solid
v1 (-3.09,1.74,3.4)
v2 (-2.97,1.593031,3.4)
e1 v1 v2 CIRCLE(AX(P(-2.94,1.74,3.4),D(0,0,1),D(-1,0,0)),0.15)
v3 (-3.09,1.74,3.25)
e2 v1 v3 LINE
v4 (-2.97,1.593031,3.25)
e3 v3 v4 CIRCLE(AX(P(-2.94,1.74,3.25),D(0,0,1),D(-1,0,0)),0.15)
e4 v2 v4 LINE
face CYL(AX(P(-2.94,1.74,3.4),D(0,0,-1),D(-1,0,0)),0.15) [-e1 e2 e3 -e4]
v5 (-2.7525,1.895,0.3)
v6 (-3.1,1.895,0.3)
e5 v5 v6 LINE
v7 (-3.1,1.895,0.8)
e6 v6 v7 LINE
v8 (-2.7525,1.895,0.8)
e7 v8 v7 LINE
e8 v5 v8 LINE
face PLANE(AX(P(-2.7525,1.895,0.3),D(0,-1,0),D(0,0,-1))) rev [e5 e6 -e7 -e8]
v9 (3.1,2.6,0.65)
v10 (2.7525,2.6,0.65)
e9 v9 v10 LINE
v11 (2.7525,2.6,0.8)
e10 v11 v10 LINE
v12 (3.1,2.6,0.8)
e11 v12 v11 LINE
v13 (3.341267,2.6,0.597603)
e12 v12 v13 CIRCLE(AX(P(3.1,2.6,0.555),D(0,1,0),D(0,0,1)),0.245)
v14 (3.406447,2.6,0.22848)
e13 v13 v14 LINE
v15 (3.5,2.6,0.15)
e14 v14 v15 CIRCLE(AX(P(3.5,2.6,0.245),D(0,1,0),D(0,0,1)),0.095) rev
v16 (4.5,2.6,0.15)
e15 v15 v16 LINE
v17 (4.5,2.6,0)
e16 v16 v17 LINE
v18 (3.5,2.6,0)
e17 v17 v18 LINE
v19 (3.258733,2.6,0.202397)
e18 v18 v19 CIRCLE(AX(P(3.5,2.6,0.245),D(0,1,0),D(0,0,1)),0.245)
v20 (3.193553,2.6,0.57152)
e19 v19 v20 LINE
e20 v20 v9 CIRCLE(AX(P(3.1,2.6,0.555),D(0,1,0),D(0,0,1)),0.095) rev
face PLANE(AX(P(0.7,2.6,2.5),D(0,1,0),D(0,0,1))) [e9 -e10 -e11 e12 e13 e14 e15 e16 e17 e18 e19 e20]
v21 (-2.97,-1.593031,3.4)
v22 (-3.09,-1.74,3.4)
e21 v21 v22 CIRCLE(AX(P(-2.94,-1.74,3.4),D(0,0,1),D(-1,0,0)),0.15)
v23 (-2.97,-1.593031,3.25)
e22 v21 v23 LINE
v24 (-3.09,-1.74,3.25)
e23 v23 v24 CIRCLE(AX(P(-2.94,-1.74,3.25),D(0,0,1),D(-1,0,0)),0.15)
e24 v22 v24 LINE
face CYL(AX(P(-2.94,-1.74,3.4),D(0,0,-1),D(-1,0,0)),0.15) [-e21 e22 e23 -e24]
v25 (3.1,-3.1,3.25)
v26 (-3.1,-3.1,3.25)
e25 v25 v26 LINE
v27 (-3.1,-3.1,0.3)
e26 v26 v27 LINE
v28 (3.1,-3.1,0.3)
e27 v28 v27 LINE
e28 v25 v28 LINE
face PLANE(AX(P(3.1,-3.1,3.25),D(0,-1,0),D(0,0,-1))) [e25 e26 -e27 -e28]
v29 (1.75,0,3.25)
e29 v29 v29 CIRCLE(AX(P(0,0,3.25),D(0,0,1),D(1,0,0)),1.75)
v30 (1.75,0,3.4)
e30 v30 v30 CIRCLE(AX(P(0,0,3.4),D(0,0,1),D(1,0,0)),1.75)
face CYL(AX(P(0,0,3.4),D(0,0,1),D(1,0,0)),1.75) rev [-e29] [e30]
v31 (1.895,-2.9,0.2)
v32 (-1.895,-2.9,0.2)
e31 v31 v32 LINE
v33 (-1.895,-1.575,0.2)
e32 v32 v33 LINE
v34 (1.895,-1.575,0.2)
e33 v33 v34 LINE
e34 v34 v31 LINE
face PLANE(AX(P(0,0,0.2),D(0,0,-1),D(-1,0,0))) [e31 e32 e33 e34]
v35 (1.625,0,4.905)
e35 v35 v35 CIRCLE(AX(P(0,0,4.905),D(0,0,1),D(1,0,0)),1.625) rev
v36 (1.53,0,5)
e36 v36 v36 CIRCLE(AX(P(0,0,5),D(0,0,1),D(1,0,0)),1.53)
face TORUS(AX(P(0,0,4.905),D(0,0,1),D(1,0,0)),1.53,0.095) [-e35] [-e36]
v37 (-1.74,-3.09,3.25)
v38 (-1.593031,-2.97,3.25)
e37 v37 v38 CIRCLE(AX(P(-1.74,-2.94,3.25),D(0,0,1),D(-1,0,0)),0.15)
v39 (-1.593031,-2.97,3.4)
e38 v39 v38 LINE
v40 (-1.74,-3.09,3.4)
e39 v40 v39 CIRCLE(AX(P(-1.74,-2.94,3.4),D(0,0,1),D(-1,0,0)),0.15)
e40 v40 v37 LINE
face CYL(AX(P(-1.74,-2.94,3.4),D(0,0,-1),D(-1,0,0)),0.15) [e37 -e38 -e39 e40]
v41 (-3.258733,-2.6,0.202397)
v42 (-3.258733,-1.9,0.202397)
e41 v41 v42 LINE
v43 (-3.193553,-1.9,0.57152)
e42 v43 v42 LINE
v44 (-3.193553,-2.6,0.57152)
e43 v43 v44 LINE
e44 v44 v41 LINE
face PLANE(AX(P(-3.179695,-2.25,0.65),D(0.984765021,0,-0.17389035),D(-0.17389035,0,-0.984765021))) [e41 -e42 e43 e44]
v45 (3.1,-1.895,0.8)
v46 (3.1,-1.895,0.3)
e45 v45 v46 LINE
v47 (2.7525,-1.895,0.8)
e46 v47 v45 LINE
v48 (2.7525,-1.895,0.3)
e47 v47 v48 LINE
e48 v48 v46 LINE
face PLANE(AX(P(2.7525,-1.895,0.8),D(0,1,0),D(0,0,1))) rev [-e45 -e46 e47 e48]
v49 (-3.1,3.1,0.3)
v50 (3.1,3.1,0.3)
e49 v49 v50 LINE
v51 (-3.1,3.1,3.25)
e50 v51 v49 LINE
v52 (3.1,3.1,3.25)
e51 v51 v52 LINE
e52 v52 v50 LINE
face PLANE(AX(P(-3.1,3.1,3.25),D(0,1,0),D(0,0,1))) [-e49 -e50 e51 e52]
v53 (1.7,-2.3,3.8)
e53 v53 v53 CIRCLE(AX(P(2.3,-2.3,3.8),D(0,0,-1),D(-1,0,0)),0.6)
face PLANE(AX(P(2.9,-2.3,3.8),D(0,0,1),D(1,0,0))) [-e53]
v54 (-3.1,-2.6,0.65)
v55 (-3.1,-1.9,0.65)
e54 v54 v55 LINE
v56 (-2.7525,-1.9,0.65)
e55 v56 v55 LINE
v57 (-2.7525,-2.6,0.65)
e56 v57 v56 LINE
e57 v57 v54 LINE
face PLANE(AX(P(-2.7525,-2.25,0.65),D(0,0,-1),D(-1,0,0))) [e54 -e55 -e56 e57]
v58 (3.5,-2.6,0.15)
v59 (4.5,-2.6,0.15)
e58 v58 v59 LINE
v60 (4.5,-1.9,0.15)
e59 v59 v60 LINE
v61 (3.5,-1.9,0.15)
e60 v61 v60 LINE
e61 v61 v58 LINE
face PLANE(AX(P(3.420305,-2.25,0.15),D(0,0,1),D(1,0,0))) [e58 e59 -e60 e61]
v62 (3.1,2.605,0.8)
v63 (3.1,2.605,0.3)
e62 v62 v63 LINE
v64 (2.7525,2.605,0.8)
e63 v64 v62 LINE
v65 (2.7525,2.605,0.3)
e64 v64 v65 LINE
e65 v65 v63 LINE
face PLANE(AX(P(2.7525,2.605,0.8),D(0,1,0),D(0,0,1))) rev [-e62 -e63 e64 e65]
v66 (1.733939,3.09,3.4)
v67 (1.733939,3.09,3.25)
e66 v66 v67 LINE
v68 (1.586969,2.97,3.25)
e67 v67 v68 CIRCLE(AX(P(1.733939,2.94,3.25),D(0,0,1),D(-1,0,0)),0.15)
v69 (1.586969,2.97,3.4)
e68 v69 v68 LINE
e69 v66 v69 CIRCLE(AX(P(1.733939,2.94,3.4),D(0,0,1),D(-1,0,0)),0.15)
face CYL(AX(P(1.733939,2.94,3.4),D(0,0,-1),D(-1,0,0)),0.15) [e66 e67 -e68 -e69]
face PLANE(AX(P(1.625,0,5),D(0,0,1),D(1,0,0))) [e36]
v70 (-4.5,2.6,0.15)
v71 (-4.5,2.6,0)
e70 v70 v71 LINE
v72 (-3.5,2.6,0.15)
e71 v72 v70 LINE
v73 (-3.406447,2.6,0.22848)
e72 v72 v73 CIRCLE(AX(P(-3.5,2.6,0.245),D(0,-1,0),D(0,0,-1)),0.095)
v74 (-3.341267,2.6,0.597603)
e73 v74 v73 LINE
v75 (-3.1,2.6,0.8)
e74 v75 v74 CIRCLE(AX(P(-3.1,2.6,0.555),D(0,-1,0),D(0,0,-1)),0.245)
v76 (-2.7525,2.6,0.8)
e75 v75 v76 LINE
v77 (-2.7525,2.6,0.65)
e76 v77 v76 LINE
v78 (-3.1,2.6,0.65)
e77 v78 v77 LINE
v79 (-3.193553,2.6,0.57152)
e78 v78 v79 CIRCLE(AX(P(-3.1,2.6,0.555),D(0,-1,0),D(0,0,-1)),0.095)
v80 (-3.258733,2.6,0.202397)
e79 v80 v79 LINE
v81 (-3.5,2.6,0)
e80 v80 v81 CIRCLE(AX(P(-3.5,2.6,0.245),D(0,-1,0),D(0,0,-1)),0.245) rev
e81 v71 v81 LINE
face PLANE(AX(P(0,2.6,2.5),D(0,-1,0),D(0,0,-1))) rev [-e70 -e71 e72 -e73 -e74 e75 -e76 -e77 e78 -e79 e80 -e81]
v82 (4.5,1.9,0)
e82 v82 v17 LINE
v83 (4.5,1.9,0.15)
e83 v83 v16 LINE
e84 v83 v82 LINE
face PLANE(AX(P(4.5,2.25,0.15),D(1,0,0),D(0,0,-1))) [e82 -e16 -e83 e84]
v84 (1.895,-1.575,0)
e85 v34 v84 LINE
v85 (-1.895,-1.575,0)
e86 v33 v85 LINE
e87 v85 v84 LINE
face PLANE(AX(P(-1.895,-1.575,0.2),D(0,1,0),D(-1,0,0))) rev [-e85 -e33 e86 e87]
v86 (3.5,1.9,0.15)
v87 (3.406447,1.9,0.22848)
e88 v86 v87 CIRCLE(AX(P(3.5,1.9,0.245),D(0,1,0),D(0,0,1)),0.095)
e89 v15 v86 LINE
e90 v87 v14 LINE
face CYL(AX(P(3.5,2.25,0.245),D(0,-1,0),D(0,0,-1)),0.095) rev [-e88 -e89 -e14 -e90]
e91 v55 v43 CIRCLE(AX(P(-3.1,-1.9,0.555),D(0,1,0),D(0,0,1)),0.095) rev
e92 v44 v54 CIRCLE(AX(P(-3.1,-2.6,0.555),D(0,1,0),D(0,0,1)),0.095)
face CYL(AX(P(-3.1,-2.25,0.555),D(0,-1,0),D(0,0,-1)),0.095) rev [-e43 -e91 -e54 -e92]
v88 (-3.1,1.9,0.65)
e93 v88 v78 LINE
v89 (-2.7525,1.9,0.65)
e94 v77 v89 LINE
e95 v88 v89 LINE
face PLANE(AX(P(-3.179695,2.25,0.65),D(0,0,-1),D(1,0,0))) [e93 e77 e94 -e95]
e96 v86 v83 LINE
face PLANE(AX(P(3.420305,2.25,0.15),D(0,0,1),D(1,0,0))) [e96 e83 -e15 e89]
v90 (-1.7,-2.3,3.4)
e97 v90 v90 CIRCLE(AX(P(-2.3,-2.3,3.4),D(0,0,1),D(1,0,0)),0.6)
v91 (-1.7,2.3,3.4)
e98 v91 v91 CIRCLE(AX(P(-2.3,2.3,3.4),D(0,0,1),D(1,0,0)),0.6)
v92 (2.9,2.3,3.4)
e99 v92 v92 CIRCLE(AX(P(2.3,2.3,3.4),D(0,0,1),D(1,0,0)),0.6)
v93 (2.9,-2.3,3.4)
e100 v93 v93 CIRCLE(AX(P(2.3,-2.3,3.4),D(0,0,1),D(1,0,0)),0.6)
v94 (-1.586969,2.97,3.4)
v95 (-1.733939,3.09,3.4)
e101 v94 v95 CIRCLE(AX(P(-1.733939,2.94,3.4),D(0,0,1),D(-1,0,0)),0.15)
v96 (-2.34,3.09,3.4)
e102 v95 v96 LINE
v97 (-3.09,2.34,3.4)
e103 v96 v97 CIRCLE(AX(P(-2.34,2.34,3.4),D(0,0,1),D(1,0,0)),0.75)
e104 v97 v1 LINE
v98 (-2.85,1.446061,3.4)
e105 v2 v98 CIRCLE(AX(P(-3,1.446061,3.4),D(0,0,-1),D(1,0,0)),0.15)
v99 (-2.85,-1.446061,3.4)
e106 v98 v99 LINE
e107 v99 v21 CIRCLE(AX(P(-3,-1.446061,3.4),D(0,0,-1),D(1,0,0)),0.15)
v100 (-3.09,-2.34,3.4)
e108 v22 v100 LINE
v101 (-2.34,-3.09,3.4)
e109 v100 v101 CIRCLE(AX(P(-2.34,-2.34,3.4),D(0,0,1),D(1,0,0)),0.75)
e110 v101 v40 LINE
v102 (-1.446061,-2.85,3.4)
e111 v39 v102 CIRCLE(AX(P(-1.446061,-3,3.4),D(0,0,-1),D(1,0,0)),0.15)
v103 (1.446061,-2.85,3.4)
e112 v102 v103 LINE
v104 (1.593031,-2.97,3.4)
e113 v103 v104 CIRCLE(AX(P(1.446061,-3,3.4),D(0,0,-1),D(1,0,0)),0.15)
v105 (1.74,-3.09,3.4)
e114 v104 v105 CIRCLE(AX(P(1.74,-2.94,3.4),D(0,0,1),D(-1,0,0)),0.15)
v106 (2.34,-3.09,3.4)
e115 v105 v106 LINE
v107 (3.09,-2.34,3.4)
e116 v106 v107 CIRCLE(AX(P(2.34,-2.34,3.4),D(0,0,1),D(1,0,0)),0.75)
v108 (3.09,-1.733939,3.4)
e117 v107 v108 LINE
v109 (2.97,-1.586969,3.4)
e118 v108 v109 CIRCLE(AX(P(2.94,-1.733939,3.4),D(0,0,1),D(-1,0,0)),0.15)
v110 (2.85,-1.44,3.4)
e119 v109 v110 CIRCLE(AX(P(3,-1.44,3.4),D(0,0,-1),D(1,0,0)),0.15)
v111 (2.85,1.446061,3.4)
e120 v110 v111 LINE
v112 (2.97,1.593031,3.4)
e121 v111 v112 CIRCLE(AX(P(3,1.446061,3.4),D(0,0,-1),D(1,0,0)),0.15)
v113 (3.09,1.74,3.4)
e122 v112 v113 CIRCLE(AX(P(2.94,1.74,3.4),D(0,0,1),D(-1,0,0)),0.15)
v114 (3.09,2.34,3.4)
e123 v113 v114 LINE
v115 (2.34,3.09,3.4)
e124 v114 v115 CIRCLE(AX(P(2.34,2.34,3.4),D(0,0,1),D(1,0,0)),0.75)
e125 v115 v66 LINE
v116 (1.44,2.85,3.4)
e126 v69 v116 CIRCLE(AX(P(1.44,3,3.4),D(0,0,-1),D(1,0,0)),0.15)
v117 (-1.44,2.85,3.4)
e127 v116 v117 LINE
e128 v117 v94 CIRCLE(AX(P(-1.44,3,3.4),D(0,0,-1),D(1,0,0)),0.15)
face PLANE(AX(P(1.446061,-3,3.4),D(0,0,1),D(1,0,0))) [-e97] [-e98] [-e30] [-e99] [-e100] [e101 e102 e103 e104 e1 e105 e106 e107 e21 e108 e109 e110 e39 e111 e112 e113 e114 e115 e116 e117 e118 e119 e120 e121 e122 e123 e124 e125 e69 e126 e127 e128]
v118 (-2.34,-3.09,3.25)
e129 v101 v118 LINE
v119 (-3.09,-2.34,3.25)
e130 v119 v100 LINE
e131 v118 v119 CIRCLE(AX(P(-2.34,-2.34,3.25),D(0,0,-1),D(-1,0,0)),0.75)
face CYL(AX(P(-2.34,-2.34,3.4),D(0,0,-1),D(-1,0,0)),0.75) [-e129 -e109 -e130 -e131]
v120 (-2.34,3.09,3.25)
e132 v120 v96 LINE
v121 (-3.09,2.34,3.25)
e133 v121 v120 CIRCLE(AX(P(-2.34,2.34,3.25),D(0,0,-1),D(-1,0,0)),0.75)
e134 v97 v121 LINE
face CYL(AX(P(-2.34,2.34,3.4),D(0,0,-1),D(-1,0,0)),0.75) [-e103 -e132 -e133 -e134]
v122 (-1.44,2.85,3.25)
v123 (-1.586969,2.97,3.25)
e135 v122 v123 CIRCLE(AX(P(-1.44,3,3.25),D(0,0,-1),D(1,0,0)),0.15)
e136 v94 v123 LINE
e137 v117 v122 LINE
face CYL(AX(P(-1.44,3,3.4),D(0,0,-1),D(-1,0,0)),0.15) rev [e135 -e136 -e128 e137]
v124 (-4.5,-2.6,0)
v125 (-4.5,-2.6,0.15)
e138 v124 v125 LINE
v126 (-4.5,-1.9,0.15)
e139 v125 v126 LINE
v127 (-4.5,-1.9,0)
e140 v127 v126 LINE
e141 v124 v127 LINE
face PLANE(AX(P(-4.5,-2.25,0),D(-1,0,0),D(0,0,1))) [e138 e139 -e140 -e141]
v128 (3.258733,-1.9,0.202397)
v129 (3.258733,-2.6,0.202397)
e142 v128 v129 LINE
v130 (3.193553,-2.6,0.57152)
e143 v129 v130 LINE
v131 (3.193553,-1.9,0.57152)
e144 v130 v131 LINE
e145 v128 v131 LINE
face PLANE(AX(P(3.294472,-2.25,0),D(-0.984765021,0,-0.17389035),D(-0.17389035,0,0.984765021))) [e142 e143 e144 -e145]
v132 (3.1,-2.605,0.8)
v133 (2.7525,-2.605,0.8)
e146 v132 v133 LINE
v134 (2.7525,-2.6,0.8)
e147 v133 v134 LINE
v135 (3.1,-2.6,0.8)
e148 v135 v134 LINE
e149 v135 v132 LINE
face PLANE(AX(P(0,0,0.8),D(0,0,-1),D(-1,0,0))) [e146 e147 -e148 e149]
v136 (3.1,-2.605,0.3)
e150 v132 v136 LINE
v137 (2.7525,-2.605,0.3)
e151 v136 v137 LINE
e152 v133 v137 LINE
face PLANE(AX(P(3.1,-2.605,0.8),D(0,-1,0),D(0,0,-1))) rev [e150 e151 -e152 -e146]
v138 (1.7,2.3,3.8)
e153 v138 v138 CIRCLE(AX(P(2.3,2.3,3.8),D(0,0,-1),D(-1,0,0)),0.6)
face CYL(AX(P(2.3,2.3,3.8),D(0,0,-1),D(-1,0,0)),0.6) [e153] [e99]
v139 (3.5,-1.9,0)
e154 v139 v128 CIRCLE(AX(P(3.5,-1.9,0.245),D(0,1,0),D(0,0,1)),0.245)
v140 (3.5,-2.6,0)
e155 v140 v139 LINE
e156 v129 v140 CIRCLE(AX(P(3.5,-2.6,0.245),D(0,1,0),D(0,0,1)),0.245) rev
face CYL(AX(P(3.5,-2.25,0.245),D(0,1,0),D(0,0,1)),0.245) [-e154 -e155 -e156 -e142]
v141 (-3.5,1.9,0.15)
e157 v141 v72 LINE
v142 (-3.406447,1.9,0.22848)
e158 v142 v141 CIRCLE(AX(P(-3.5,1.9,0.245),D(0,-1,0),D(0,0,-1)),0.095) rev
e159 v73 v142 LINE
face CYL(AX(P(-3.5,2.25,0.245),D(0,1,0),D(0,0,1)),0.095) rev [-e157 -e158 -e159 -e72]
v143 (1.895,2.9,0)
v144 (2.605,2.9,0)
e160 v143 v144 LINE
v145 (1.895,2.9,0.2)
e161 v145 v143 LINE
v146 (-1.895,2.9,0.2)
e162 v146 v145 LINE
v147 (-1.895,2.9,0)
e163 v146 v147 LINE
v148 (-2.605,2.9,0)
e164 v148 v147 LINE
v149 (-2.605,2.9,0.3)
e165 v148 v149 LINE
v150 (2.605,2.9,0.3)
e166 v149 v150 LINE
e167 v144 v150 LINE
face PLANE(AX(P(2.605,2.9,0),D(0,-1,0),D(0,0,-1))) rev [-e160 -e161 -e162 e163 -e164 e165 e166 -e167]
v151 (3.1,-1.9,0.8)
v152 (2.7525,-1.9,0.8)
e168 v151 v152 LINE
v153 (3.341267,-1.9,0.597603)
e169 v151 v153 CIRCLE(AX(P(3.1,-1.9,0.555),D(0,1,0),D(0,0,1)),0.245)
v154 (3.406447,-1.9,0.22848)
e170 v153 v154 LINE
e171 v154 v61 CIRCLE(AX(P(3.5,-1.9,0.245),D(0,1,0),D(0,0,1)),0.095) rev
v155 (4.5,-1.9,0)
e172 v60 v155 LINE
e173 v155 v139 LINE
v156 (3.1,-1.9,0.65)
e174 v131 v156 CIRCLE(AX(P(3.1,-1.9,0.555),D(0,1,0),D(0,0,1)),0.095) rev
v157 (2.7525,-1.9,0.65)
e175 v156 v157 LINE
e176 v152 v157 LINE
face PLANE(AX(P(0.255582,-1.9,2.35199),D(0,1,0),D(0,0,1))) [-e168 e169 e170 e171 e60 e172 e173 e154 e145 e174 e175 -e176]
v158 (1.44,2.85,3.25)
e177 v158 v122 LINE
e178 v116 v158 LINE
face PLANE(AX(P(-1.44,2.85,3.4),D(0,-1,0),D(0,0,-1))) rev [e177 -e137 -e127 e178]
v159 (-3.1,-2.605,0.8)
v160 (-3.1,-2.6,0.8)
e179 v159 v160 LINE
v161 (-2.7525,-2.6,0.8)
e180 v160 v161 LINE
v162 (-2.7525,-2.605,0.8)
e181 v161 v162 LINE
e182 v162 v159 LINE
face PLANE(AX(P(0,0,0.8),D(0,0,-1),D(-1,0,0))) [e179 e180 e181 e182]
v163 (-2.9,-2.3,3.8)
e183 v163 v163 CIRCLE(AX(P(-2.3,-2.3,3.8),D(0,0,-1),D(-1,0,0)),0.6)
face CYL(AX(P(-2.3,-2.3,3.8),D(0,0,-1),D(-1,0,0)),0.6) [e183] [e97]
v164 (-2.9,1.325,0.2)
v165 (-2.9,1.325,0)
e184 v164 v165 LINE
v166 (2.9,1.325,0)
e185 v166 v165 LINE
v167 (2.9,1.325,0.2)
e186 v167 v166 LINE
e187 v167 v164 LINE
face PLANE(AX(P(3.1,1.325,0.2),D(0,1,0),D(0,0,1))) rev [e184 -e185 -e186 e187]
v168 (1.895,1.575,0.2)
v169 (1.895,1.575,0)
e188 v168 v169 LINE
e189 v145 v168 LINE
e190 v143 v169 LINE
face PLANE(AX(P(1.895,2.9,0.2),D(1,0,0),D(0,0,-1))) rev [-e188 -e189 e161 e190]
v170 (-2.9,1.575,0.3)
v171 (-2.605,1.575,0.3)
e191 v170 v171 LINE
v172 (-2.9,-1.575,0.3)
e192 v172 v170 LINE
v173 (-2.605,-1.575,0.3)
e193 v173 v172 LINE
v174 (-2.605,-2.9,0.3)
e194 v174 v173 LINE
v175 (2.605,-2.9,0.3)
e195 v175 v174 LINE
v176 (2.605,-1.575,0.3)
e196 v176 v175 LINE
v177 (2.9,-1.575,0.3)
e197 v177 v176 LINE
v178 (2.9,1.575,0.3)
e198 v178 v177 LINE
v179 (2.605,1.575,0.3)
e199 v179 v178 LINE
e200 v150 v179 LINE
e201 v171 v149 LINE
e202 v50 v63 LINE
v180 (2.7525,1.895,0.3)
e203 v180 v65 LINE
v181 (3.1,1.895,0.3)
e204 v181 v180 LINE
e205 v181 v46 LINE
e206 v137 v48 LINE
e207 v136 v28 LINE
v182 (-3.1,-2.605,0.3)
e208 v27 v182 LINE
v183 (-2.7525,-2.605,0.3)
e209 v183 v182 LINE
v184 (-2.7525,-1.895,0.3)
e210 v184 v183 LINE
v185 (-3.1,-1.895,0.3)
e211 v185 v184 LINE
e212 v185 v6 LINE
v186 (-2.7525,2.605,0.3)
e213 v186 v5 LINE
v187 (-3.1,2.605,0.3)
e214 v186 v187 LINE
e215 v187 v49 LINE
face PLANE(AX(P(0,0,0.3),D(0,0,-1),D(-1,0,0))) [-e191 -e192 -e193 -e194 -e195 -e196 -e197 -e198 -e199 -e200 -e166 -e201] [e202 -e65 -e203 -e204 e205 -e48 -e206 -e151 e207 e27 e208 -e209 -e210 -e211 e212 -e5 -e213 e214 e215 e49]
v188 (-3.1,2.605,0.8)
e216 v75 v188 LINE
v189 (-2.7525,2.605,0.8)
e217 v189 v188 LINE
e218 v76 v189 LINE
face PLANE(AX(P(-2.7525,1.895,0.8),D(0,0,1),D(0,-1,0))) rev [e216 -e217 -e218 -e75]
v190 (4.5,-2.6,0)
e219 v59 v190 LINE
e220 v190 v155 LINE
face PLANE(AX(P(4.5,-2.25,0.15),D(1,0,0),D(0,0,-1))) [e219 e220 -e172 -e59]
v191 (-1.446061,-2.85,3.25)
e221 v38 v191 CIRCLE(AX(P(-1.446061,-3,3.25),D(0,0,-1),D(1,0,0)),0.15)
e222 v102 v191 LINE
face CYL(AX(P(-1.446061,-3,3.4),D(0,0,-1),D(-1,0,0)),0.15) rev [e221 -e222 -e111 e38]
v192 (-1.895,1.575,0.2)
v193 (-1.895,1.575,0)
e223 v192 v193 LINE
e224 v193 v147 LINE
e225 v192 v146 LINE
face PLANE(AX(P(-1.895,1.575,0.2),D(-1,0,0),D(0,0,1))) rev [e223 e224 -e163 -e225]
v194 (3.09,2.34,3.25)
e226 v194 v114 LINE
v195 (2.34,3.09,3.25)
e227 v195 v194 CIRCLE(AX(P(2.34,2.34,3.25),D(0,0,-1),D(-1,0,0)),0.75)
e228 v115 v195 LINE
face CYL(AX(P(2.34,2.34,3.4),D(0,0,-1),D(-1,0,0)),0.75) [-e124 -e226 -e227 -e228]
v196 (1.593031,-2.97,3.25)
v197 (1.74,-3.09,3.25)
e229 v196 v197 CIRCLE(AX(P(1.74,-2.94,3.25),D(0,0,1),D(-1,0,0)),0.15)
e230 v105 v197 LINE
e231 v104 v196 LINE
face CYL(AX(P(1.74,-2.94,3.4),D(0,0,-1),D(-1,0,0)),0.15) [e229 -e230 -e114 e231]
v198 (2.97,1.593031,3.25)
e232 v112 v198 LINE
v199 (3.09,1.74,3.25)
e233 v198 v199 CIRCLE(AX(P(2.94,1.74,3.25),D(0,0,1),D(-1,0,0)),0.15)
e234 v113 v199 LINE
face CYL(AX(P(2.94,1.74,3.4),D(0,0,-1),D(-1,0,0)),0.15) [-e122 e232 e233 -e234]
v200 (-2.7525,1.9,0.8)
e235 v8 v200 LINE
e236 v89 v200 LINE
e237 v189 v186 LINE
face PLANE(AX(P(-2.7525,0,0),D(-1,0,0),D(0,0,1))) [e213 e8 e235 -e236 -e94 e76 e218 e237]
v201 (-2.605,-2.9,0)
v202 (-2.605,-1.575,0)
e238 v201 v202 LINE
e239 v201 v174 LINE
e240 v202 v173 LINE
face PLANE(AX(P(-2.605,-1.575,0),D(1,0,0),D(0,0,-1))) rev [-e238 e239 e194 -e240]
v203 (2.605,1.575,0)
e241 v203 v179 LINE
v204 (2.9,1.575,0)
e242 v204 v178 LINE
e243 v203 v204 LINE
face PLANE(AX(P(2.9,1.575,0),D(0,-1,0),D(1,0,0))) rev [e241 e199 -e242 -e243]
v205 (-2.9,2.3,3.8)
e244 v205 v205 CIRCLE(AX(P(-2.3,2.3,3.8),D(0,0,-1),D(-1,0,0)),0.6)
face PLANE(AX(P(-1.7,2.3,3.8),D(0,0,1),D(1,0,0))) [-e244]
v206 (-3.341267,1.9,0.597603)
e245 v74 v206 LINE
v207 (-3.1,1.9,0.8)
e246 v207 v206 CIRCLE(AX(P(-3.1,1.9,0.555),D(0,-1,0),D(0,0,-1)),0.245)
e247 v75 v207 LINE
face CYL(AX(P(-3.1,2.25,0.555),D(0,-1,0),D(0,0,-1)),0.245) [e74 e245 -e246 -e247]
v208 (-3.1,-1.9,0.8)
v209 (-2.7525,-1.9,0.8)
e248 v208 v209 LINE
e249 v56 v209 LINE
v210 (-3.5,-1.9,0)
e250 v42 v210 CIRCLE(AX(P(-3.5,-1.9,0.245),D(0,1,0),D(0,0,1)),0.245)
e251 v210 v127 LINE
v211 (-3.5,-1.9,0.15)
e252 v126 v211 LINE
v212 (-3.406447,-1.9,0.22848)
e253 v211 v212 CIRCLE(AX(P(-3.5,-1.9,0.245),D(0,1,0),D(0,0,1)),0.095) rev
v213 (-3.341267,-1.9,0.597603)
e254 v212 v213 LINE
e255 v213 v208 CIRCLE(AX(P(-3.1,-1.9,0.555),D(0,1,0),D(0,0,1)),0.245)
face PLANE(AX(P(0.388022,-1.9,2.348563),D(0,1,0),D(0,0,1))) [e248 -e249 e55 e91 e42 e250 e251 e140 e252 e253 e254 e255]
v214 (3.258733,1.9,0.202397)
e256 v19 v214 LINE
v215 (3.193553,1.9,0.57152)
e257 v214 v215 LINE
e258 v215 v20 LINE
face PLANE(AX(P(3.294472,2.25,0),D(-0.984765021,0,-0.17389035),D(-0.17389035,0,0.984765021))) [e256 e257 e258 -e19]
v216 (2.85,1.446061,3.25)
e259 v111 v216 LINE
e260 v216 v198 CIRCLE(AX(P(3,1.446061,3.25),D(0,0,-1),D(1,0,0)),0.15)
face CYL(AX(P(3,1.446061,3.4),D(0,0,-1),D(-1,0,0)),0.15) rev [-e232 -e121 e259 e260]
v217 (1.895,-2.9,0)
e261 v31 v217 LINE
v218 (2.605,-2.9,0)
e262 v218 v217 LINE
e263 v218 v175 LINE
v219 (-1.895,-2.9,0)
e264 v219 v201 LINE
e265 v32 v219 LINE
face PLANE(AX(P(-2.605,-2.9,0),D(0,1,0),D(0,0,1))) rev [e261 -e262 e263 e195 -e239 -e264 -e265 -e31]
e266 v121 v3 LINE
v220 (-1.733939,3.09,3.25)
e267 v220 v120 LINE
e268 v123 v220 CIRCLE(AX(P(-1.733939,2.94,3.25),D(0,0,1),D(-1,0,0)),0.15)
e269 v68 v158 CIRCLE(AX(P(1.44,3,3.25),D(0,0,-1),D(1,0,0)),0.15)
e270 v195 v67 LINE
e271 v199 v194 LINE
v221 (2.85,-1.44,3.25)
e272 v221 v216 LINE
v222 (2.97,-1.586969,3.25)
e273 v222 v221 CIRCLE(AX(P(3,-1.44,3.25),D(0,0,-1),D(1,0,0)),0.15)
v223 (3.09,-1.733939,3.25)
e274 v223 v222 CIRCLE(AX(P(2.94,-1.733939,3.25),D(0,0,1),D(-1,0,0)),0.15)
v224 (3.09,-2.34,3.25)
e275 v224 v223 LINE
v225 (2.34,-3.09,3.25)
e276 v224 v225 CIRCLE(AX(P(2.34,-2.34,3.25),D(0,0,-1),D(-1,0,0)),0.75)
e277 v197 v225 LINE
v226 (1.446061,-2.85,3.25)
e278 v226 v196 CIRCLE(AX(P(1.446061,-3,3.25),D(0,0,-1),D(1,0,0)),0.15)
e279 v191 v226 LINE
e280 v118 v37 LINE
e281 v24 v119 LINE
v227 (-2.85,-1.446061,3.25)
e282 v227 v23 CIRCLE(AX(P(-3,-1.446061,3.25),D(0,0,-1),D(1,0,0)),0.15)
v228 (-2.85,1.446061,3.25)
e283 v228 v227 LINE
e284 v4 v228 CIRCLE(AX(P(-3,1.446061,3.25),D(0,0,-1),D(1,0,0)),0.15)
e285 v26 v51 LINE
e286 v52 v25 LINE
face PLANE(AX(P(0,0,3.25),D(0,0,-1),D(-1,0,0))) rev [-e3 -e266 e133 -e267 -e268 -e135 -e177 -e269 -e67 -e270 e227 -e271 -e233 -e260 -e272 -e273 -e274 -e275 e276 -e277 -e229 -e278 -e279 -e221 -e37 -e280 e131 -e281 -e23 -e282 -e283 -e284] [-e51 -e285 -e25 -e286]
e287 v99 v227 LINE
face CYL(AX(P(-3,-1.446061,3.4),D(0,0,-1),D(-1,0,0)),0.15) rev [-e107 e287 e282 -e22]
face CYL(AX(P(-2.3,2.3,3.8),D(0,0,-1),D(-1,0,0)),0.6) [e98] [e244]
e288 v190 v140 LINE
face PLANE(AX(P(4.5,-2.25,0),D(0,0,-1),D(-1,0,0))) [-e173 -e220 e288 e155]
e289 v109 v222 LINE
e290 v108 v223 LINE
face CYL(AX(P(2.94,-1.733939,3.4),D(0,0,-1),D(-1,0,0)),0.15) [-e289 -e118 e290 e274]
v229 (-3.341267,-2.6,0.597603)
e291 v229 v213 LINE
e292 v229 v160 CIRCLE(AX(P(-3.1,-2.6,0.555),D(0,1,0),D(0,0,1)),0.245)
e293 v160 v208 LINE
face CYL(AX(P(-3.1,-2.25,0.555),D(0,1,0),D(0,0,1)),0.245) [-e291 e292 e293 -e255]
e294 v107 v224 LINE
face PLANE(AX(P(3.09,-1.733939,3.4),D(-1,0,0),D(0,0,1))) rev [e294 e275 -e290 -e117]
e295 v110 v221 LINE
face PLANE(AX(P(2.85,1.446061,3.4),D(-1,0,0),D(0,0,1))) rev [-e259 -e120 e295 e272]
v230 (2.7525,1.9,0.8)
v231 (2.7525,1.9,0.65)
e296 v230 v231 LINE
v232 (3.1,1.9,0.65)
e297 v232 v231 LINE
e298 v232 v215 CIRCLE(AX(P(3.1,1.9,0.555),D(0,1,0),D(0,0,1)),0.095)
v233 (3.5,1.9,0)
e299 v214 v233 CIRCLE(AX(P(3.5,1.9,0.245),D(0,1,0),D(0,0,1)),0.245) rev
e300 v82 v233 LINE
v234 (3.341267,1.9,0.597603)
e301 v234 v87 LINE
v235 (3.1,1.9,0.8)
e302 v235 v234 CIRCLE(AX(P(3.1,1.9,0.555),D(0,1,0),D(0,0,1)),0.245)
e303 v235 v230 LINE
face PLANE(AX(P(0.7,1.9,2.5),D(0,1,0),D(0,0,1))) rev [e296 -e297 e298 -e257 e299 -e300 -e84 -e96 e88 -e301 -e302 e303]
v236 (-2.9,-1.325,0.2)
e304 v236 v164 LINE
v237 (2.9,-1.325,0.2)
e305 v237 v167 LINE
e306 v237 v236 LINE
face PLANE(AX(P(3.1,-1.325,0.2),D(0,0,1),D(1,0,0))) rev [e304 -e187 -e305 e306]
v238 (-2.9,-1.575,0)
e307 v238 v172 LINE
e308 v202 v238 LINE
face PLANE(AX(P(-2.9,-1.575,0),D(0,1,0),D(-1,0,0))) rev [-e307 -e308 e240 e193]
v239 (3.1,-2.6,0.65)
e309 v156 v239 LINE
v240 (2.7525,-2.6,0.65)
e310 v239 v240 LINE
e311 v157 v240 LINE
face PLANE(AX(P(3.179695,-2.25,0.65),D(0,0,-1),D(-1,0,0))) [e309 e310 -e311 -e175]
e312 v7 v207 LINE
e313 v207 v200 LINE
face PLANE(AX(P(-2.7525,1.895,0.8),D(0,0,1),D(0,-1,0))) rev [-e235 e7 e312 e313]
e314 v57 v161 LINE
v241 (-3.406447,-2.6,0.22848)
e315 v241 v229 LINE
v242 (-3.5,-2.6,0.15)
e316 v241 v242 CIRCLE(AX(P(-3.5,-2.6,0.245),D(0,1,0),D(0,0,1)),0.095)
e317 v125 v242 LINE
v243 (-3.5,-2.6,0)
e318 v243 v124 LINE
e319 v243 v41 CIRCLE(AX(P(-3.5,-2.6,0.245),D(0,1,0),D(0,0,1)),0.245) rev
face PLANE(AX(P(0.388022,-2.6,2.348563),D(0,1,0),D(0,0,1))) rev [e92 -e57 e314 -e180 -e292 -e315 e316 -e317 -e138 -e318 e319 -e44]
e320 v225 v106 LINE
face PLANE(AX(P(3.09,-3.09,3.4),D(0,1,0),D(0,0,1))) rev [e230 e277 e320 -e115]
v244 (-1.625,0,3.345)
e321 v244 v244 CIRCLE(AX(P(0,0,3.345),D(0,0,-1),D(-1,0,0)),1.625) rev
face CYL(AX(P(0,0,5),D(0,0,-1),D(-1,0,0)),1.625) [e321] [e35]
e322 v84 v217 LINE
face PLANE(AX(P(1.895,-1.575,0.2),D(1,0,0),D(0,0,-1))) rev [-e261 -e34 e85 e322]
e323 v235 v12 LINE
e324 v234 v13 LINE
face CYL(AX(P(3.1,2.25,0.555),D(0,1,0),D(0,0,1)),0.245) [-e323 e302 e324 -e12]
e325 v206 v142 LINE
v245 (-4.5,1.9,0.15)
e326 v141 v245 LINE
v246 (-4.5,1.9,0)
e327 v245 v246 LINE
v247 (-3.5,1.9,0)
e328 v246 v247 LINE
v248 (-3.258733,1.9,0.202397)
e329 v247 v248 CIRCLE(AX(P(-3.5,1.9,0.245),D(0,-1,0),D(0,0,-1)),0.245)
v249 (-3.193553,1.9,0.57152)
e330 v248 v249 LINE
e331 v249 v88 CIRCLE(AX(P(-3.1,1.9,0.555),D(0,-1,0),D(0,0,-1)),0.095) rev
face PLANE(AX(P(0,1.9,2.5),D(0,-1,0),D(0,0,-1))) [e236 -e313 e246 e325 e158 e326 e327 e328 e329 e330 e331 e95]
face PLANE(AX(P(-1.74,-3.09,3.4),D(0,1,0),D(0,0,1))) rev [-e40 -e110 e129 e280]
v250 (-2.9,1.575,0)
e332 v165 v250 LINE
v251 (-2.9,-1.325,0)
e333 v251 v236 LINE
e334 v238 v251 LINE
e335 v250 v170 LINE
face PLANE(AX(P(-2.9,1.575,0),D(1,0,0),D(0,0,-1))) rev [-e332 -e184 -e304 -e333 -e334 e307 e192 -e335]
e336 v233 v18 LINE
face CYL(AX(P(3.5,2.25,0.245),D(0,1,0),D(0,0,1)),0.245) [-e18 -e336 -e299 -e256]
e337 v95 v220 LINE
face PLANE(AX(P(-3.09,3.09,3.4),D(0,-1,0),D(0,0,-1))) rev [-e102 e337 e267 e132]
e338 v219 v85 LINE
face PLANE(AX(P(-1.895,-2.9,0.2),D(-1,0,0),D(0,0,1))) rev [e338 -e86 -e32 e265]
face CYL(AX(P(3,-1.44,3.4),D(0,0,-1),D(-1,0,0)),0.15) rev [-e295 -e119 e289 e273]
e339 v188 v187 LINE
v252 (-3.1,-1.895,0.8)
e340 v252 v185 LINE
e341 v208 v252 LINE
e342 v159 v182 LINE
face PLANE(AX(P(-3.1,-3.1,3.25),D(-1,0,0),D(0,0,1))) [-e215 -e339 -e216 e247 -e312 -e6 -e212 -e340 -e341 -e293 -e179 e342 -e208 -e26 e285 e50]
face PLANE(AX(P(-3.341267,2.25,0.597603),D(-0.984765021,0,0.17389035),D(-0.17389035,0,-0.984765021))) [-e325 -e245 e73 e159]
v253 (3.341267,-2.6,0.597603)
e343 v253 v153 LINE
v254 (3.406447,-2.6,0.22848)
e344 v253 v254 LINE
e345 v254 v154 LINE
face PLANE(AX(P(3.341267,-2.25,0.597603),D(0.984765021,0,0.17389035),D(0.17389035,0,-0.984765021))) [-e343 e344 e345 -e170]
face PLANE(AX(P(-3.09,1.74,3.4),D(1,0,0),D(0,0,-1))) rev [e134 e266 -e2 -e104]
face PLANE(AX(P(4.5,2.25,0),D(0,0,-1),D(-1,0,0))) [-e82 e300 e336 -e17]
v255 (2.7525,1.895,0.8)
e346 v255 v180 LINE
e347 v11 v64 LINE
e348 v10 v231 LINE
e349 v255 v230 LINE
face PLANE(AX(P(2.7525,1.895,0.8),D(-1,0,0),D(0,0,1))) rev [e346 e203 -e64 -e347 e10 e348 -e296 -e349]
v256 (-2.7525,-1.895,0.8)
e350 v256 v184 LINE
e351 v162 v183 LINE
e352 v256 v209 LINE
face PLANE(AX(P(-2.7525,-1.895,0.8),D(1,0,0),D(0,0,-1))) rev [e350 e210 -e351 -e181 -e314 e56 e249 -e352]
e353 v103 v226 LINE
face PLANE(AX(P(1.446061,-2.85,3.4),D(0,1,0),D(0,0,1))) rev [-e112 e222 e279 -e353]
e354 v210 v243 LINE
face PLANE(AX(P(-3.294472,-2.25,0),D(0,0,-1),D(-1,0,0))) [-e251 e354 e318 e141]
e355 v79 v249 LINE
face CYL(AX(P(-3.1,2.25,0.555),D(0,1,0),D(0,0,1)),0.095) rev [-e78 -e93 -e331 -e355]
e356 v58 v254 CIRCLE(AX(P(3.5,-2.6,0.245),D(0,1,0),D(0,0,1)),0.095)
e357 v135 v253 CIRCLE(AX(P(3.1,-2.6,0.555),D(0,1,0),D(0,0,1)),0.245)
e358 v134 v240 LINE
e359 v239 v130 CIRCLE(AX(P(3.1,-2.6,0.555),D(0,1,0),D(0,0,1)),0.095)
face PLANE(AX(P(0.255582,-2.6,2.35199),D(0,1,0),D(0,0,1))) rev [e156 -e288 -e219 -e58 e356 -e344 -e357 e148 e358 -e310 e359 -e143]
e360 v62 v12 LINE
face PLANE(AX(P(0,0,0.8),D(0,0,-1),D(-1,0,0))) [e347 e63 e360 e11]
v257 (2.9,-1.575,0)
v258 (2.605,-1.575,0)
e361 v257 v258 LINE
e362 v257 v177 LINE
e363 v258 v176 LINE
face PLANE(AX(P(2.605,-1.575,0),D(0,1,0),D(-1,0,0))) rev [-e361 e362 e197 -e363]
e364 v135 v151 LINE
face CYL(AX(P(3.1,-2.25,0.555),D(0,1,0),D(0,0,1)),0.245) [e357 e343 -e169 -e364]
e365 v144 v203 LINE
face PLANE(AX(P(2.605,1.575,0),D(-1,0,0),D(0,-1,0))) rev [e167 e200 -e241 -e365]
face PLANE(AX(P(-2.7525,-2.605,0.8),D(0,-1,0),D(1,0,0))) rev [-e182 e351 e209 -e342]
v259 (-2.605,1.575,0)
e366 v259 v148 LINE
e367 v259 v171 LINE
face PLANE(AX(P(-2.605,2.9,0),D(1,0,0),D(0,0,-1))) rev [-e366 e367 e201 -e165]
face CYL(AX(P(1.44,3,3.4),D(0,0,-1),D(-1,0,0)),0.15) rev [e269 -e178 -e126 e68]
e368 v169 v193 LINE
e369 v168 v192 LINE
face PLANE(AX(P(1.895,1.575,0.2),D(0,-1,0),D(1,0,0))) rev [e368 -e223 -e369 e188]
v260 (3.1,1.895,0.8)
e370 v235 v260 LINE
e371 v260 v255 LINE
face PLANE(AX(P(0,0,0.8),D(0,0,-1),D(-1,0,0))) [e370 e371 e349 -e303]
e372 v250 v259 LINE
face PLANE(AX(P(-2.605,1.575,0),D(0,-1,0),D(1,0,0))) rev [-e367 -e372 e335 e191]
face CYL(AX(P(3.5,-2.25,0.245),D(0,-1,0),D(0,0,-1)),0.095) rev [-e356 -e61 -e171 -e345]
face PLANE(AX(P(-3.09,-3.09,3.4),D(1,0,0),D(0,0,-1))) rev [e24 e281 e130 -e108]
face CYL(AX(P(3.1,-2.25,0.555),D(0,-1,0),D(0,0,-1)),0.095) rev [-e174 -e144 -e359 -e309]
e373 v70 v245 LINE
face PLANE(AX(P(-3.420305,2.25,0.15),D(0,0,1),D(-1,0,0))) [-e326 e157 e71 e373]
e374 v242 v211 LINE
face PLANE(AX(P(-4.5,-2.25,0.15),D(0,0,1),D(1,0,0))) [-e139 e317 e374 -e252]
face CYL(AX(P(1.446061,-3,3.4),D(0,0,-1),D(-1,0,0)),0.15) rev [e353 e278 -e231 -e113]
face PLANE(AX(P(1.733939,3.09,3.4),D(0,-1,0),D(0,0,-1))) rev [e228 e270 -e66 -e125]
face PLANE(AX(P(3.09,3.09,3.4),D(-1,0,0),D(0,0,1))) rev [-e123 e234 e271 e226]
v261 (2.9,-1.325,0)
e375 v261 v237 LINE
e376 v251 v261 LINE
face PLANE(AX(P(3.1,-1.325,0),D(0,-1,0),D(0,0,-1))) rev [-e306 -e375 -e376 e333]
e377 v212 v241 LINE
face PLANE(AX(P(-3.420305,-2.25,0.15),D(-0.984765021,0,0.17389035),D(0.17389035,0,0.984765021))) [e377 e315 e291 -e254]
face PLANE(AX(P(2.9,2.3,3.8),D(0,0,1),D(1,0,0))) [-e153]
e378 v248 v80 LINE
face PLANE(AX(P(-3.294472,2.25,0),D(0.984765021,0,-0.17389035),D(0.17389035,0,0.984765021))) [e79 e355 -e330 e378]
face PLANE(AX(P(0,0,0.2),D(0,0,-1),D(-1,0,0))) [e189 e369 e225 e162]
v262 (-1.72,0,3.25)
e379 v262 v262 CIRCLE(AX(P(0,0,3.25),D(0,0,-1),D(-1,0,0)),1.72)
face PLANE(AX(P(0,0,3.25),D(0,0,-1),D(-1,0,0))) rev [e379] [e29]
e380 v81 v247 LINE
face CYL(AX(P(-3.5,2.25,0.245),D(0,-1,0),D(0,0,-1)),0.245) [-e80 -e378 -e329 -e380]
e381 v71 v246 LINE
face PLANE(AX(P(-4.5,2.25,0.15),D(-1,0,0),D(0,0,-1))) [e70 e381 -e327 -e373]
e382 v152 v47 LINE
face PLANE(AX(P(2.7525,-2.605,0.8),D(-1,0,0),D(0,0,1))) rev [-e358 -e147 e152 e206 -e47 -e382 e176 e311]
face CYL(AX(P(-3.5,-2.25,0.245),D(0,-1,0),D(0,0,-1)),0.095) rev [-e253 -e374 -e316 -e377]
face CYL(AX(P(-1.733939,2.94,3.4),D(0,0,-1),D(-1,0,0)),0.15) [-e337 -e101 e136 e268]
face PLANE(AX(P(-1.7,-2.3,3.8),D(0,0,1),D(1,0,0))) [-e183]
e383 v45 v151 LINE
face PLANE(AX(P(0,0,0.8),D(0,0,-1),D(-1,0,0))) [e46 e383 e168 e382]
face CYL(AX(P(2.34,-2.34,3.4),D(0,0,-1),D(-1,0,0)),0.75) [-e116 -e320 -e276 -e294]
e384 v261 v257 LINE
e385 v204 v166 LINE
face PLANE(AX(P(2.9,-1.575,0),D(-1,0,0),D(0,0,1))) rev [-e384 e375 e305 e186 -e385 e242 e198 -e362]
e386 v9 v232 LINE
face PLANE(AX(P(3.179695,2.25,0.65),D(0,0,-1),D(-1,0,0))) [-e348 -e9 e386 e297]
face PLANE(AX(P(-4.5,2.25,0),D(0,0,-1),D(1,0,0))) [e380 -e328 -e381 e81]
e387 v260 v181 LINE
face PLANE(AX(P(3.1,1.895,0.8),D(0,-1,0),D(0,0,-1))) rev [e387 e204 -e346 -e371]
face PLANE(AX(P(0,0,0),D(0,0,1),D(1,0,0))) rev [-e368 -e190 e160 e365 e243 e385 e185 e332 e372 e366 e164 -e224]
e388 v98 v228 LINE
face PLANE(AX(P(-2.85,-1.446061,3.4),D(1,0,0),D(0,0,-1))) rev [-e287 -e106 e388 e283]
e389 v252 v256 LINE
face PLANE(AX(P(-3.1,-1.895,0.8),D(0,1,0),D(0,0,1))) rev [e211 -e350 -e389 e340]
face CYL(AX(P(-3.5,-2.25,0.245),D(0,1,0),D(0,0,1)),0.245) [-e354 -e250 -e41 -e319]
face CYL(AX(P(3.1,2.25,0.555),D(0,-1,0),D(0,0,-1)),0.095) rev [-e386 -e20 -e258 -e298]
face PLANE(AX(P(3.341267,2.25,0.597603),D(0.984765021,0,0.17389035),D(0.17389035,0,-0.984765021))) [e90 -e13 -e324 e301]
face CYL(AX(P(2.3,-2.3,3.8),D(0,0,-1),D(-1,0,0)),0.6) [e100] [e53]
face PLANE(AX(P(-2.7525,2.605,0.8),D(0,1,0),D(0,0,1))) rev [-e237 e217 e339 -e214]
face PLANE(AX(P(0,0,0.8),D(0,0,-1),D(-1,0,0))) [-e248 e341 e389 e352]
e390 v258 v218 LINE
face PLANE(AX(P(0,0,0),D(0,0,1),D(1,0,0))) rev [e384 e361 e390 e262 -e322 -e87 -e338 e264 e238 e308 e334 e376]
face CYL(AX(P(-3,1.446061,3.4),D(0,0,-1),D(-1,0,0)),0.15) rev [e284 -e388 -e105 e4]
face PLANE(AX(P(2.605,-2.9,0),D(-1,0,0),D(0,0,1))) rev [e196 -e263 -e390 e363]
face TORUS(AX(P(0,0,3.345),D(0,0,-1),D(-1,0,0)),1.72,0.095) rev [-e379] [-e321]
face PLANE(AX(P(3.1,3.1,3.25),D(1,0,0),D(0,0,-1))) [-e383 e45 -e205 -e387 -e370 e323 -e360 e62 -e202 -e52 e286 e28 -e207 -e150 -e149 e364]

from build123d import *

# Parameters (mm, degrees)
ESQUISSE1_W                         = 6.2
ESQUISSE1_H                         = 6.2
BOSS_EXTRU_1_DEPTH                  = 2.95
BOSS_EXTRU_2_DEPTH                  = 0.3
ESQUISSE3_W                         = 0.2
ESQUISSE3_H                         = 2.65
ENL_V_MAT_EXTRU_1_DEPTH             = 8.494831552
ESQUISSE4_W                         = 3.79
ESQUISSE4_H                         = 1.325
ENL_V_MAT_EXTRU_2_DEPTH             = 0.2
ESQUISSE5_W                         = 3.79
ESQUISSE5_H                         = 1.325
ENL_V_MAT_EXTRU_3_DEPTH             = 0.2
ESQUISSE6_W                         = 0.3475
ESQUISSE6_H                         = 0.71
ENL_V_MAT_EXTRU_4_DEPTH             = 0.5
ESQUISSE7_W                         = 0.5
ESQUISSE7_H                         = 0.71
ENL_V_MAT_EXTRU_5_DEPTH             = 0.3475
ESQUISSE8_W                         = 0.3475
ESQUISSE8_H                         = 0.71
ENL_V_MAT_EXTRU_6_DEPTH             = 0.5
ESQUISSE9_W                         = 0.3475
ESQUISSE9_H                         = 0.71
ENL_V_MAT_EXTRU_7_DEPTH             = 0.5
BOSS_EXTRU_3_DEPTH                  = 0.15
DIAM_TRE_DU_PER_AGE_3_5_3_5_1_D     = 3.5
DIAM_TRE_DU_PER_AGE_3_5_3_5_1_DEPTH = 0.15
ESQUISSE13_W                        = 0.6
ESQUISSE13_H                        = 0.4
ESQUISSE14_W                        = 0.6
ESQUISSE14_H                        = 0.4
ESQUISSE15_W                        = 0.6
ESQUISSE15_H                        = 0.4
ESQUISSE16_W                        = 0.6
ESQUISSE16_H                        = 0.4
ESQUISSE17_W                        = 1.625
ESQUISSE17_H                        = 1.75
NERVURE1_START                      = -0.35
NERVURE1_DEPTH                      = 0.7
NERVURE2_START                      = -0.35
NERVURE2_DEPTH                      = 0.7
NERVURE3_START                      = -0.35
NERVURE3_DEPTH                      = 0.7
NERVURE4_START                      = -0.35
NERVURE4_DEPTH                      = 0.7
CONG_1_R                            = 0.095
CONG_2_R                            = 0.245
CONG_3_R                            = 0.75


# Read off the part's stored shape, not the designer's step: Nervure1, Nervure2, Nervure3, Nervure4
with BuildPart() as part:
    # Esquisse1 → Boss.-Extru.1 (new body)
    with BuildSketch(Plane(origin=(0, 0, 0.3), x_dir=(-1, 0, 0), z_dir=(0, 0, -1))):
        Rectangle(ESQUISSE1_W, ESQUISSE1_H)
    extrude(amount=-BOSS_EXTRU_1_DEPTH)

    # Esquisse2 → Boss.-Extru.2 (add)
    with BuildSketch(Plane(origin=(0, 0, 0.3), x_dir=(-1, 0, 0), z_dir=(0, 0, -1))):
        Polygon((-2.9, 1.575), (-2.605, 1.575), (-2.605, 2.9), (2.605, 2.9), (2.605, 1.575), (2.9, 1.575), (2.9, -1.575), (2.605, -1.575), (2.605, -2.9), (-2.605, -2.9), (-2.605, -1.575), (-2.9, -1.575), align=None)
    extrude(amount=BOSS_EXTRU_2_DEPTH)

    # Esquisse3 → Enlèv. mat.-Extru.1 (cut, through all)
    with BuildSketch(Plane.ZY.offset(2.9)):
        with Locations((0.1, 0)):
            Rectangle(ESQUISSE3_W, ESQUISSE3_H)
    extrude(amount=-ENL_V_MAT_EXTRU_1_DEPTH, mode=Mode.SUBTRACT)

    # Esquisse4 → Enlèv. mat.-Extru.2 (cut)
    with BuildSketch(Plane(origin=(0, 0, 0), x_dir=(-1, 0, 0), z_dir=(0, 0, -1))):
        with Locations((0, -2.2375)):
            Rectangle(ESQUISSE4_W, ESQUISSE4_H)
    extrude(amount=-ENL_V_MAT_EXTRU_2_DEPTH, mode=Mode.SUBTRACT)

    # Esquisse5 → Enlèv. mat.-Extru.3 (cut)
    with BuildSketch(Plane(origin=(0, 0, 0), x_dir=(-1, 0, 0), z_dir=(0, 0, -1))):
        with Locations((0, 2.2375)):
            Rectangle(ESQUISSE5_W, ESQUISSE5_H)
    extrude(amount=-ENL_V_MAT_EXTRU_3_DEPTH, mode=Mode.SUBTRACT)

    # Esquisse6 → Enlèv. mat.-Extru.4 (cut)
    with BuildSketch(Plane(origin=(0, 0, 0.3), x_dir=(-1, 0, 0), z_dir=(0, 0, -1))):
        with Locations((2.92625, -2.25)):
            Rectangle(ESQUISSE6_W, ESQUISSE6_H)
    extrude(amount=-ENL_V_MAT_EXTRU_4_DEPTH, mode=Mode.SUBTRACT)

    # Esquisse7 → Enlèv. mat.-Extru.5 (cut)
    with BuildSketch(Plane.ZY.offset(3.1)):
        with Locations((0.55, 2.25)):
            Rectangle(ESQUISSE7_W, ESQUISSE7_H)
    extrude(amount=-ENL_V_MAT_EXTRU_5_DEPTH, mode=Mode.SUBTRACT)

    # Esquisse8 → Enlèv. mat.-Extru.6 (cut)
    with BuildSketch(Plane(origin=(0, 0, 0.3), x_dir=(-1, 0, 0), z_dir=(0, 0, -1))):
        with Locations((-2.92625, -2.25)):
            Rectangle(ESQUISSE8_W, ESQUISSE8_H)
    extrude(amount=-ENL_V_MAT_EXTRU_6_DEPTH, mode=Mode.SUBTRACT)

    # Esquisse9 → Enlèv. mat.-Extru.7 (cut)
    with BuildSketch(Plane(origin=(0, 0, 0.3), x_dir=(-1, 0, 0), z_dir=(0, 0, -1))):
        with Locations((-2.92625, 2.25)):
            Rectangle(ESQUISSE9_W, ESQUISSE9_H)
    extrude(amount=-ENL_V_MAT_EXTRU_7_DEPTH, mode=Mode.SUBTRACT)

    # Esquisse10 → Boss.-Extru.3 (add)
    with BuildSketch(Plane.XY.offset(3.25)):
        with BuildLine():
            Line((1.446061231, -2.85), (-1.446061231, -2.85))
            ThreePointArc((-1.446061231, -2.85), (-1.540929561, -2.8838105), (-1.593030615, -2.97))
            ThreePointArc((-1.593030615, -2.97), (-1.64513167, -3.0561895), (-1.74, -3.09))
            Line((-1.74, -3.09), (-3.09, -3.09))
            Line((-3.09, -3.09), (-3.09, -1.74))
            ThreePointArc((-3.09, -1.74), (-3.0561895, -1.64513167), (-2.97, -1.593030615))
            ThreePointArc((-2.97, -1.593030615), (-2.8838105, -1.540929561), (-2.85, -1.446061231))
            Line((-2.85, -1.446061231), (-2.85, 1.446061231))
            ThreePointArc((-2.85, 1.446061231), (-2.8838105, 1.540929561), (-2.97, 1.593030615))
            ThreePointArc((-2.97, 1.593030615), (-3.0561895, 1.64513167), (-3.09, 1.74))
            Line((-3.09, 1.74), (-3.09, 3.09))
            Line((-3.09, 3.09), (-1.733938769, 3.09))
            ThreePointArc((-1.733938769, 3.09), (-1.639070439, 3.0561895), (-1.586969385, 2.97))
            ThreePointArc((-1.586969385, 2.97), (-1.53486833, 2.8838105), (-1.44, 2.85))
            Line((-1.44, 2.85), (1.44, 2.85))
            ThreePointArc((1.44, 2.85), (1.53486833, 2.8838105), (1.586969385, 2.97))
            ThreePointArc((1.586969385, 2.97), (1.639070439, 3.0561895), (1.733938769, 3.09))
            Line((1.733938769, 3.09), (3.09, 3.09))
            Line((3.09, 3.09), (3.09, 1.74))
            ThreePointArc((3.09, 1.74), (3.0561895, 1.64513167), (2.97, 1.593030615))
            ThreePointArc((2.97, 1.593030615), (2.8838105, 1.540929561), (2.85, 1.446061231))
            Line((2.85, 1.446061231), (2.85, -1.44))
            ThreePointArc((2.85, -1.44), (2.8838105, -1.53486833), (2.97, -1.586969385))
            ThreePointArc((2.97, -1.586969385), (3.0561895, -1.639070439), (3.09, -1.733938769))
            Line((3.09, -1.733938769), (3.09, -3.09))
            Line((3.09, -3.09), (1.74, -3.09))
            ThreePointArc((1.74, -3.09), (1.64513167, -3.0561895), (1.593030615, -2.97))
            ThreePointArc((1.593030615, -2.97), (1.540929561, -2.8838105), (1.446061231, -2.85))
        make_face()
    extrude(amount=BOSS_EXTRU_3_DEPTH)

    # Diamètre du perçage Ø3.5 (3.5)1
    with Locations(Plane.XY.offset(3.4)):
        with Locations((0, 0)):
            Hole(DIAM_TRE_DU_PER_AGE_3_5_3_5_1_D / 2, depth=DIAM_TRE_DU_PER_AGE_3_5_3_5_1_DEPTH)

    # Esquisse13 → Révolution1 (revolve)
    with BuildSketch(Plane.XZ.offset(2.3), mode=Mode.PRIVATE) as r_volution1_sk:
        with Locations((-2, 3.6)):
            Rectangle(ESQUISSE13_W, ESQUISSE13_H)
    revolve(r_volution1_sk.sketch.rotate(Axis((-2.3, -2.3, 3.8), (0, 0, -1)), 180), axis=Axis((-2.3, -2.3, 3.8), (0, 0, -1)))

    # Esquisse14 → Révolution2 (revolve)
    with BuildSketch(Plane.XZ.offset(-2.3), mode=Mode.PRIVATE) as r_volution2_sk:
        with Locations((2.6, 3.6)):
            Rectangle(ESQUISSE14_W, ESQUISSE14_H)
    revolve(r_volution2_sk.sketch.rotate(Axis((2.3, 2.3, 3.8), (0, 0, -1)), 180), axis=Axis((2.3, 2.3, 3.8), (0, 0, -1)))

    # Esquisse15 → Révolution3 (revolve)
    with BuildSketch(Plane.XZ.offset(2.3), mode=Mode.PRIVATE) as r_volution3_sk:
        with Locations((2.6, 3.6)):
            Rectangle(ESQUISSE15_W, ESQUISSE15_H)
    revolve(r_volution3_sk.sketch.rotate(Axis((2.3, -2.3, 3.8), (0, 0, -1)), 180), axis=Axis((2.3, -2.3, 3.8), (0, 0, -1)))

    # Esquisse16 → Révolution4 (revolve)
    with BuildSketch(Plane.XZ.offset(-2.3), mode=Mode.PRIVATE) as r_volution4_sk:
        with Locations((-2, 3.6)):
            Rectangle(ESQUISSE16_W, ESQUISSE16_H)
    revolve(r_volution4_sk.sketch.rotate(Axis((-2.3, 2.3, 3.8), (0, 0, -1)), 180), axis=Axis((-2.3, 2.3, 3.8), (0, 0, -1)))

    # Esquisse17 → Révolution5 (revolve)
    with BuildSketch(Plane.XZ):
        with Locations((0.8125, 4.125)):
            Rectangle(ESQUISSE17_W, ESQUISSE17_H)
    revolve(axis=Axis((0, 0, 5), (0, 0, -1)))

    # Nervure1 outline → Nervure1 (add)
    with BuildSketch(Plane(origin=(0, -2.25, 0), x_dir=(1, 0, 0), z_dir=(0, 1, 0)).offset(NERVURE1_START)):
        with BuildLine():
            Line((4.5, -0.15), (4.5, 0))
            Line((4.5, 0), (3.29447192, 0))
            Line((3.29447192, 0), (3.179694562, -0.65))
            Line((3.179694562, -0.65), (2.7525, -0.65))
            Line((2.7525, -0.65), (2.7525, -0.8))
            Line((2.7525, -0.8), (3.1, -0.8))
            ThreePointArc((3.1, -0.8), (3.257459887, -0.742700251), (3.34126743, -0.597603136))
            Line((3.34126743, -0.597603136), (3.420305438, -0.15))
            Line((3.420305438, -0.15), (4.5, -0.15))
        make_face()
    extrude(amount=NERVURE1_DEPTH)

    # Nervure2 outline → Nervure2 (add)
    with BuildSketch(Plane(origin=(0, 2.25, 0), x_dir=(1, 0, 0), z_dir=(0, 1, 0)).offset(NERVURE2_START)):
        with BuildLine():
            Line((4.5, -0.15), (4.5, 0))
            Line((4.5, 0), (3.29447192, 0))
            Line((3.29447192, 0), (3.179694562, -0.65))
            Line((3.179694562, -0.65), (2.7525, -0.65))
            Line((2.7525, -0.65), (2.7525, -0.8))
            Line((2.7525, -0.8), (3.1, -0.8))
            ThreePointArc((3.1, -0.8), (3.257459887, -0.742700251), (3.34126743, -0.597603136))
            Line((3.34126743, -0.597603136), (3.420305438, -0.15))
            Line((3.420305438, -0.15), (4.5, -0.15))
        make_face()
    extrude(amount=NERVURE2_DEPTH)

    # Nervure3 outline → Nervure3 (add)
    with BuildSketch(Plane(origin=(0, -2.25, 0), x_dir=(1, 0, 0), z_dir=(0, 1, 0)).offset(NERVURE3_START)):
        with BuildLine():
            Line((-3.179694562, -0.65), (-3.29447192, 0))
            Line((-3.29447192, 0), (-4.5, 0))
            Line((-4.5, 0), (-4.5, -0.15))
            Line((-4.5, -0.15), (-3.420305438, -0.15))
            Line((-3.420305438, -0.15), (-3.34126743, -0.597603136))
            ThreePointArc((-3.34126743, -0.597603136), (-3.257459887, -0.742700251), (-3.1, -0.8))
            Line((-3.1, -0.8), (-2.7525, -0.8))
            Line((-2.7525, -0.8), (-2.7525, -0.65))
            Line((-2.7525, -0.65), (-3.179694562, -0.65))
        make_face()
    extrude(amount=NERVURE3_DEPTH)

    # Nervure4 outline → Nervure4 (add)
    with BuildSketch(Plane.XZ.offset(-2.25).offset(NERVURE4_START)):
        with BuildLine():
            Line((-4.5, 0.15), (-4.5, 0))
            Line((-4.5, 0), (-3.29447192, 0))
            Line((-3.29447192, 0), (-3.179694562, 0.65))
            Line((-3.179694562, 0.65), (-2.7525, 0.65))
            Line((-2.7525, 0.65), (-2.7525, 0.8))
            Line((-2.7525, 0.8), (-3.1, 0.8))
            ThreePointArc((-3.1, 0.8), (-3.257459887, 0.742700251), (-3.34126743, 0.597603136))
            Line((-3.34126743, 0.597603136), (-3.420305438, 0.15))
            Line((-3.420305438, 0.15), (-4.5, 0.15))
        make_face()
    extrude(amount=NERVURE4_DEPTH)

    # Congé1
    cong_1_edges = [part.edges().sort_by_distance(p)[0] for p in [
        (-1.625, 0, 5),
        (-1.625, 0, 3.25),
        (3.420305438, -2.25, 0.15),
        (3.179694562, -2.25, 0.65),
        (3.420305438, 2.25, 0.15),
        (3.179694562, 2.25, 0.65),
        (-3.179694562, -2.25, 0.65),
        (-3.420305438, -2.25, 0.15),
        (-3.420305438, 2.25, 0.15),
        (-3.179694562, 2.25, 0.65),
    ]]
    fillet(cong_1_edges, radius=CONG_1_R)

    # Congé2
    cong_2_edges = [part.edges().sort_by_distance(p)[0] for p in [
        (3.29447192, -2.25, 0),
        (3.29447192, 2.25, 0),
        (-3.29447192, -2.25, 0),
        (-3.29447192, 2.25, 0),
    ]]
    fillet(cong_2_edges, radius=CONG_2_R)

    # Congé3
    cong_3_edges = [part.edges().sort_by_distance(p)[0] for p in [
        (3.09, -3.09, 3.325),
        (3.09, 3.09, 3.325),
        (-3.09, 3.09, 3.325),
        (-3.09, -3.09, 3.325),
    ]]
    fillet(cong_3_edges, radius=CONG_3_R)


solid = part.part
